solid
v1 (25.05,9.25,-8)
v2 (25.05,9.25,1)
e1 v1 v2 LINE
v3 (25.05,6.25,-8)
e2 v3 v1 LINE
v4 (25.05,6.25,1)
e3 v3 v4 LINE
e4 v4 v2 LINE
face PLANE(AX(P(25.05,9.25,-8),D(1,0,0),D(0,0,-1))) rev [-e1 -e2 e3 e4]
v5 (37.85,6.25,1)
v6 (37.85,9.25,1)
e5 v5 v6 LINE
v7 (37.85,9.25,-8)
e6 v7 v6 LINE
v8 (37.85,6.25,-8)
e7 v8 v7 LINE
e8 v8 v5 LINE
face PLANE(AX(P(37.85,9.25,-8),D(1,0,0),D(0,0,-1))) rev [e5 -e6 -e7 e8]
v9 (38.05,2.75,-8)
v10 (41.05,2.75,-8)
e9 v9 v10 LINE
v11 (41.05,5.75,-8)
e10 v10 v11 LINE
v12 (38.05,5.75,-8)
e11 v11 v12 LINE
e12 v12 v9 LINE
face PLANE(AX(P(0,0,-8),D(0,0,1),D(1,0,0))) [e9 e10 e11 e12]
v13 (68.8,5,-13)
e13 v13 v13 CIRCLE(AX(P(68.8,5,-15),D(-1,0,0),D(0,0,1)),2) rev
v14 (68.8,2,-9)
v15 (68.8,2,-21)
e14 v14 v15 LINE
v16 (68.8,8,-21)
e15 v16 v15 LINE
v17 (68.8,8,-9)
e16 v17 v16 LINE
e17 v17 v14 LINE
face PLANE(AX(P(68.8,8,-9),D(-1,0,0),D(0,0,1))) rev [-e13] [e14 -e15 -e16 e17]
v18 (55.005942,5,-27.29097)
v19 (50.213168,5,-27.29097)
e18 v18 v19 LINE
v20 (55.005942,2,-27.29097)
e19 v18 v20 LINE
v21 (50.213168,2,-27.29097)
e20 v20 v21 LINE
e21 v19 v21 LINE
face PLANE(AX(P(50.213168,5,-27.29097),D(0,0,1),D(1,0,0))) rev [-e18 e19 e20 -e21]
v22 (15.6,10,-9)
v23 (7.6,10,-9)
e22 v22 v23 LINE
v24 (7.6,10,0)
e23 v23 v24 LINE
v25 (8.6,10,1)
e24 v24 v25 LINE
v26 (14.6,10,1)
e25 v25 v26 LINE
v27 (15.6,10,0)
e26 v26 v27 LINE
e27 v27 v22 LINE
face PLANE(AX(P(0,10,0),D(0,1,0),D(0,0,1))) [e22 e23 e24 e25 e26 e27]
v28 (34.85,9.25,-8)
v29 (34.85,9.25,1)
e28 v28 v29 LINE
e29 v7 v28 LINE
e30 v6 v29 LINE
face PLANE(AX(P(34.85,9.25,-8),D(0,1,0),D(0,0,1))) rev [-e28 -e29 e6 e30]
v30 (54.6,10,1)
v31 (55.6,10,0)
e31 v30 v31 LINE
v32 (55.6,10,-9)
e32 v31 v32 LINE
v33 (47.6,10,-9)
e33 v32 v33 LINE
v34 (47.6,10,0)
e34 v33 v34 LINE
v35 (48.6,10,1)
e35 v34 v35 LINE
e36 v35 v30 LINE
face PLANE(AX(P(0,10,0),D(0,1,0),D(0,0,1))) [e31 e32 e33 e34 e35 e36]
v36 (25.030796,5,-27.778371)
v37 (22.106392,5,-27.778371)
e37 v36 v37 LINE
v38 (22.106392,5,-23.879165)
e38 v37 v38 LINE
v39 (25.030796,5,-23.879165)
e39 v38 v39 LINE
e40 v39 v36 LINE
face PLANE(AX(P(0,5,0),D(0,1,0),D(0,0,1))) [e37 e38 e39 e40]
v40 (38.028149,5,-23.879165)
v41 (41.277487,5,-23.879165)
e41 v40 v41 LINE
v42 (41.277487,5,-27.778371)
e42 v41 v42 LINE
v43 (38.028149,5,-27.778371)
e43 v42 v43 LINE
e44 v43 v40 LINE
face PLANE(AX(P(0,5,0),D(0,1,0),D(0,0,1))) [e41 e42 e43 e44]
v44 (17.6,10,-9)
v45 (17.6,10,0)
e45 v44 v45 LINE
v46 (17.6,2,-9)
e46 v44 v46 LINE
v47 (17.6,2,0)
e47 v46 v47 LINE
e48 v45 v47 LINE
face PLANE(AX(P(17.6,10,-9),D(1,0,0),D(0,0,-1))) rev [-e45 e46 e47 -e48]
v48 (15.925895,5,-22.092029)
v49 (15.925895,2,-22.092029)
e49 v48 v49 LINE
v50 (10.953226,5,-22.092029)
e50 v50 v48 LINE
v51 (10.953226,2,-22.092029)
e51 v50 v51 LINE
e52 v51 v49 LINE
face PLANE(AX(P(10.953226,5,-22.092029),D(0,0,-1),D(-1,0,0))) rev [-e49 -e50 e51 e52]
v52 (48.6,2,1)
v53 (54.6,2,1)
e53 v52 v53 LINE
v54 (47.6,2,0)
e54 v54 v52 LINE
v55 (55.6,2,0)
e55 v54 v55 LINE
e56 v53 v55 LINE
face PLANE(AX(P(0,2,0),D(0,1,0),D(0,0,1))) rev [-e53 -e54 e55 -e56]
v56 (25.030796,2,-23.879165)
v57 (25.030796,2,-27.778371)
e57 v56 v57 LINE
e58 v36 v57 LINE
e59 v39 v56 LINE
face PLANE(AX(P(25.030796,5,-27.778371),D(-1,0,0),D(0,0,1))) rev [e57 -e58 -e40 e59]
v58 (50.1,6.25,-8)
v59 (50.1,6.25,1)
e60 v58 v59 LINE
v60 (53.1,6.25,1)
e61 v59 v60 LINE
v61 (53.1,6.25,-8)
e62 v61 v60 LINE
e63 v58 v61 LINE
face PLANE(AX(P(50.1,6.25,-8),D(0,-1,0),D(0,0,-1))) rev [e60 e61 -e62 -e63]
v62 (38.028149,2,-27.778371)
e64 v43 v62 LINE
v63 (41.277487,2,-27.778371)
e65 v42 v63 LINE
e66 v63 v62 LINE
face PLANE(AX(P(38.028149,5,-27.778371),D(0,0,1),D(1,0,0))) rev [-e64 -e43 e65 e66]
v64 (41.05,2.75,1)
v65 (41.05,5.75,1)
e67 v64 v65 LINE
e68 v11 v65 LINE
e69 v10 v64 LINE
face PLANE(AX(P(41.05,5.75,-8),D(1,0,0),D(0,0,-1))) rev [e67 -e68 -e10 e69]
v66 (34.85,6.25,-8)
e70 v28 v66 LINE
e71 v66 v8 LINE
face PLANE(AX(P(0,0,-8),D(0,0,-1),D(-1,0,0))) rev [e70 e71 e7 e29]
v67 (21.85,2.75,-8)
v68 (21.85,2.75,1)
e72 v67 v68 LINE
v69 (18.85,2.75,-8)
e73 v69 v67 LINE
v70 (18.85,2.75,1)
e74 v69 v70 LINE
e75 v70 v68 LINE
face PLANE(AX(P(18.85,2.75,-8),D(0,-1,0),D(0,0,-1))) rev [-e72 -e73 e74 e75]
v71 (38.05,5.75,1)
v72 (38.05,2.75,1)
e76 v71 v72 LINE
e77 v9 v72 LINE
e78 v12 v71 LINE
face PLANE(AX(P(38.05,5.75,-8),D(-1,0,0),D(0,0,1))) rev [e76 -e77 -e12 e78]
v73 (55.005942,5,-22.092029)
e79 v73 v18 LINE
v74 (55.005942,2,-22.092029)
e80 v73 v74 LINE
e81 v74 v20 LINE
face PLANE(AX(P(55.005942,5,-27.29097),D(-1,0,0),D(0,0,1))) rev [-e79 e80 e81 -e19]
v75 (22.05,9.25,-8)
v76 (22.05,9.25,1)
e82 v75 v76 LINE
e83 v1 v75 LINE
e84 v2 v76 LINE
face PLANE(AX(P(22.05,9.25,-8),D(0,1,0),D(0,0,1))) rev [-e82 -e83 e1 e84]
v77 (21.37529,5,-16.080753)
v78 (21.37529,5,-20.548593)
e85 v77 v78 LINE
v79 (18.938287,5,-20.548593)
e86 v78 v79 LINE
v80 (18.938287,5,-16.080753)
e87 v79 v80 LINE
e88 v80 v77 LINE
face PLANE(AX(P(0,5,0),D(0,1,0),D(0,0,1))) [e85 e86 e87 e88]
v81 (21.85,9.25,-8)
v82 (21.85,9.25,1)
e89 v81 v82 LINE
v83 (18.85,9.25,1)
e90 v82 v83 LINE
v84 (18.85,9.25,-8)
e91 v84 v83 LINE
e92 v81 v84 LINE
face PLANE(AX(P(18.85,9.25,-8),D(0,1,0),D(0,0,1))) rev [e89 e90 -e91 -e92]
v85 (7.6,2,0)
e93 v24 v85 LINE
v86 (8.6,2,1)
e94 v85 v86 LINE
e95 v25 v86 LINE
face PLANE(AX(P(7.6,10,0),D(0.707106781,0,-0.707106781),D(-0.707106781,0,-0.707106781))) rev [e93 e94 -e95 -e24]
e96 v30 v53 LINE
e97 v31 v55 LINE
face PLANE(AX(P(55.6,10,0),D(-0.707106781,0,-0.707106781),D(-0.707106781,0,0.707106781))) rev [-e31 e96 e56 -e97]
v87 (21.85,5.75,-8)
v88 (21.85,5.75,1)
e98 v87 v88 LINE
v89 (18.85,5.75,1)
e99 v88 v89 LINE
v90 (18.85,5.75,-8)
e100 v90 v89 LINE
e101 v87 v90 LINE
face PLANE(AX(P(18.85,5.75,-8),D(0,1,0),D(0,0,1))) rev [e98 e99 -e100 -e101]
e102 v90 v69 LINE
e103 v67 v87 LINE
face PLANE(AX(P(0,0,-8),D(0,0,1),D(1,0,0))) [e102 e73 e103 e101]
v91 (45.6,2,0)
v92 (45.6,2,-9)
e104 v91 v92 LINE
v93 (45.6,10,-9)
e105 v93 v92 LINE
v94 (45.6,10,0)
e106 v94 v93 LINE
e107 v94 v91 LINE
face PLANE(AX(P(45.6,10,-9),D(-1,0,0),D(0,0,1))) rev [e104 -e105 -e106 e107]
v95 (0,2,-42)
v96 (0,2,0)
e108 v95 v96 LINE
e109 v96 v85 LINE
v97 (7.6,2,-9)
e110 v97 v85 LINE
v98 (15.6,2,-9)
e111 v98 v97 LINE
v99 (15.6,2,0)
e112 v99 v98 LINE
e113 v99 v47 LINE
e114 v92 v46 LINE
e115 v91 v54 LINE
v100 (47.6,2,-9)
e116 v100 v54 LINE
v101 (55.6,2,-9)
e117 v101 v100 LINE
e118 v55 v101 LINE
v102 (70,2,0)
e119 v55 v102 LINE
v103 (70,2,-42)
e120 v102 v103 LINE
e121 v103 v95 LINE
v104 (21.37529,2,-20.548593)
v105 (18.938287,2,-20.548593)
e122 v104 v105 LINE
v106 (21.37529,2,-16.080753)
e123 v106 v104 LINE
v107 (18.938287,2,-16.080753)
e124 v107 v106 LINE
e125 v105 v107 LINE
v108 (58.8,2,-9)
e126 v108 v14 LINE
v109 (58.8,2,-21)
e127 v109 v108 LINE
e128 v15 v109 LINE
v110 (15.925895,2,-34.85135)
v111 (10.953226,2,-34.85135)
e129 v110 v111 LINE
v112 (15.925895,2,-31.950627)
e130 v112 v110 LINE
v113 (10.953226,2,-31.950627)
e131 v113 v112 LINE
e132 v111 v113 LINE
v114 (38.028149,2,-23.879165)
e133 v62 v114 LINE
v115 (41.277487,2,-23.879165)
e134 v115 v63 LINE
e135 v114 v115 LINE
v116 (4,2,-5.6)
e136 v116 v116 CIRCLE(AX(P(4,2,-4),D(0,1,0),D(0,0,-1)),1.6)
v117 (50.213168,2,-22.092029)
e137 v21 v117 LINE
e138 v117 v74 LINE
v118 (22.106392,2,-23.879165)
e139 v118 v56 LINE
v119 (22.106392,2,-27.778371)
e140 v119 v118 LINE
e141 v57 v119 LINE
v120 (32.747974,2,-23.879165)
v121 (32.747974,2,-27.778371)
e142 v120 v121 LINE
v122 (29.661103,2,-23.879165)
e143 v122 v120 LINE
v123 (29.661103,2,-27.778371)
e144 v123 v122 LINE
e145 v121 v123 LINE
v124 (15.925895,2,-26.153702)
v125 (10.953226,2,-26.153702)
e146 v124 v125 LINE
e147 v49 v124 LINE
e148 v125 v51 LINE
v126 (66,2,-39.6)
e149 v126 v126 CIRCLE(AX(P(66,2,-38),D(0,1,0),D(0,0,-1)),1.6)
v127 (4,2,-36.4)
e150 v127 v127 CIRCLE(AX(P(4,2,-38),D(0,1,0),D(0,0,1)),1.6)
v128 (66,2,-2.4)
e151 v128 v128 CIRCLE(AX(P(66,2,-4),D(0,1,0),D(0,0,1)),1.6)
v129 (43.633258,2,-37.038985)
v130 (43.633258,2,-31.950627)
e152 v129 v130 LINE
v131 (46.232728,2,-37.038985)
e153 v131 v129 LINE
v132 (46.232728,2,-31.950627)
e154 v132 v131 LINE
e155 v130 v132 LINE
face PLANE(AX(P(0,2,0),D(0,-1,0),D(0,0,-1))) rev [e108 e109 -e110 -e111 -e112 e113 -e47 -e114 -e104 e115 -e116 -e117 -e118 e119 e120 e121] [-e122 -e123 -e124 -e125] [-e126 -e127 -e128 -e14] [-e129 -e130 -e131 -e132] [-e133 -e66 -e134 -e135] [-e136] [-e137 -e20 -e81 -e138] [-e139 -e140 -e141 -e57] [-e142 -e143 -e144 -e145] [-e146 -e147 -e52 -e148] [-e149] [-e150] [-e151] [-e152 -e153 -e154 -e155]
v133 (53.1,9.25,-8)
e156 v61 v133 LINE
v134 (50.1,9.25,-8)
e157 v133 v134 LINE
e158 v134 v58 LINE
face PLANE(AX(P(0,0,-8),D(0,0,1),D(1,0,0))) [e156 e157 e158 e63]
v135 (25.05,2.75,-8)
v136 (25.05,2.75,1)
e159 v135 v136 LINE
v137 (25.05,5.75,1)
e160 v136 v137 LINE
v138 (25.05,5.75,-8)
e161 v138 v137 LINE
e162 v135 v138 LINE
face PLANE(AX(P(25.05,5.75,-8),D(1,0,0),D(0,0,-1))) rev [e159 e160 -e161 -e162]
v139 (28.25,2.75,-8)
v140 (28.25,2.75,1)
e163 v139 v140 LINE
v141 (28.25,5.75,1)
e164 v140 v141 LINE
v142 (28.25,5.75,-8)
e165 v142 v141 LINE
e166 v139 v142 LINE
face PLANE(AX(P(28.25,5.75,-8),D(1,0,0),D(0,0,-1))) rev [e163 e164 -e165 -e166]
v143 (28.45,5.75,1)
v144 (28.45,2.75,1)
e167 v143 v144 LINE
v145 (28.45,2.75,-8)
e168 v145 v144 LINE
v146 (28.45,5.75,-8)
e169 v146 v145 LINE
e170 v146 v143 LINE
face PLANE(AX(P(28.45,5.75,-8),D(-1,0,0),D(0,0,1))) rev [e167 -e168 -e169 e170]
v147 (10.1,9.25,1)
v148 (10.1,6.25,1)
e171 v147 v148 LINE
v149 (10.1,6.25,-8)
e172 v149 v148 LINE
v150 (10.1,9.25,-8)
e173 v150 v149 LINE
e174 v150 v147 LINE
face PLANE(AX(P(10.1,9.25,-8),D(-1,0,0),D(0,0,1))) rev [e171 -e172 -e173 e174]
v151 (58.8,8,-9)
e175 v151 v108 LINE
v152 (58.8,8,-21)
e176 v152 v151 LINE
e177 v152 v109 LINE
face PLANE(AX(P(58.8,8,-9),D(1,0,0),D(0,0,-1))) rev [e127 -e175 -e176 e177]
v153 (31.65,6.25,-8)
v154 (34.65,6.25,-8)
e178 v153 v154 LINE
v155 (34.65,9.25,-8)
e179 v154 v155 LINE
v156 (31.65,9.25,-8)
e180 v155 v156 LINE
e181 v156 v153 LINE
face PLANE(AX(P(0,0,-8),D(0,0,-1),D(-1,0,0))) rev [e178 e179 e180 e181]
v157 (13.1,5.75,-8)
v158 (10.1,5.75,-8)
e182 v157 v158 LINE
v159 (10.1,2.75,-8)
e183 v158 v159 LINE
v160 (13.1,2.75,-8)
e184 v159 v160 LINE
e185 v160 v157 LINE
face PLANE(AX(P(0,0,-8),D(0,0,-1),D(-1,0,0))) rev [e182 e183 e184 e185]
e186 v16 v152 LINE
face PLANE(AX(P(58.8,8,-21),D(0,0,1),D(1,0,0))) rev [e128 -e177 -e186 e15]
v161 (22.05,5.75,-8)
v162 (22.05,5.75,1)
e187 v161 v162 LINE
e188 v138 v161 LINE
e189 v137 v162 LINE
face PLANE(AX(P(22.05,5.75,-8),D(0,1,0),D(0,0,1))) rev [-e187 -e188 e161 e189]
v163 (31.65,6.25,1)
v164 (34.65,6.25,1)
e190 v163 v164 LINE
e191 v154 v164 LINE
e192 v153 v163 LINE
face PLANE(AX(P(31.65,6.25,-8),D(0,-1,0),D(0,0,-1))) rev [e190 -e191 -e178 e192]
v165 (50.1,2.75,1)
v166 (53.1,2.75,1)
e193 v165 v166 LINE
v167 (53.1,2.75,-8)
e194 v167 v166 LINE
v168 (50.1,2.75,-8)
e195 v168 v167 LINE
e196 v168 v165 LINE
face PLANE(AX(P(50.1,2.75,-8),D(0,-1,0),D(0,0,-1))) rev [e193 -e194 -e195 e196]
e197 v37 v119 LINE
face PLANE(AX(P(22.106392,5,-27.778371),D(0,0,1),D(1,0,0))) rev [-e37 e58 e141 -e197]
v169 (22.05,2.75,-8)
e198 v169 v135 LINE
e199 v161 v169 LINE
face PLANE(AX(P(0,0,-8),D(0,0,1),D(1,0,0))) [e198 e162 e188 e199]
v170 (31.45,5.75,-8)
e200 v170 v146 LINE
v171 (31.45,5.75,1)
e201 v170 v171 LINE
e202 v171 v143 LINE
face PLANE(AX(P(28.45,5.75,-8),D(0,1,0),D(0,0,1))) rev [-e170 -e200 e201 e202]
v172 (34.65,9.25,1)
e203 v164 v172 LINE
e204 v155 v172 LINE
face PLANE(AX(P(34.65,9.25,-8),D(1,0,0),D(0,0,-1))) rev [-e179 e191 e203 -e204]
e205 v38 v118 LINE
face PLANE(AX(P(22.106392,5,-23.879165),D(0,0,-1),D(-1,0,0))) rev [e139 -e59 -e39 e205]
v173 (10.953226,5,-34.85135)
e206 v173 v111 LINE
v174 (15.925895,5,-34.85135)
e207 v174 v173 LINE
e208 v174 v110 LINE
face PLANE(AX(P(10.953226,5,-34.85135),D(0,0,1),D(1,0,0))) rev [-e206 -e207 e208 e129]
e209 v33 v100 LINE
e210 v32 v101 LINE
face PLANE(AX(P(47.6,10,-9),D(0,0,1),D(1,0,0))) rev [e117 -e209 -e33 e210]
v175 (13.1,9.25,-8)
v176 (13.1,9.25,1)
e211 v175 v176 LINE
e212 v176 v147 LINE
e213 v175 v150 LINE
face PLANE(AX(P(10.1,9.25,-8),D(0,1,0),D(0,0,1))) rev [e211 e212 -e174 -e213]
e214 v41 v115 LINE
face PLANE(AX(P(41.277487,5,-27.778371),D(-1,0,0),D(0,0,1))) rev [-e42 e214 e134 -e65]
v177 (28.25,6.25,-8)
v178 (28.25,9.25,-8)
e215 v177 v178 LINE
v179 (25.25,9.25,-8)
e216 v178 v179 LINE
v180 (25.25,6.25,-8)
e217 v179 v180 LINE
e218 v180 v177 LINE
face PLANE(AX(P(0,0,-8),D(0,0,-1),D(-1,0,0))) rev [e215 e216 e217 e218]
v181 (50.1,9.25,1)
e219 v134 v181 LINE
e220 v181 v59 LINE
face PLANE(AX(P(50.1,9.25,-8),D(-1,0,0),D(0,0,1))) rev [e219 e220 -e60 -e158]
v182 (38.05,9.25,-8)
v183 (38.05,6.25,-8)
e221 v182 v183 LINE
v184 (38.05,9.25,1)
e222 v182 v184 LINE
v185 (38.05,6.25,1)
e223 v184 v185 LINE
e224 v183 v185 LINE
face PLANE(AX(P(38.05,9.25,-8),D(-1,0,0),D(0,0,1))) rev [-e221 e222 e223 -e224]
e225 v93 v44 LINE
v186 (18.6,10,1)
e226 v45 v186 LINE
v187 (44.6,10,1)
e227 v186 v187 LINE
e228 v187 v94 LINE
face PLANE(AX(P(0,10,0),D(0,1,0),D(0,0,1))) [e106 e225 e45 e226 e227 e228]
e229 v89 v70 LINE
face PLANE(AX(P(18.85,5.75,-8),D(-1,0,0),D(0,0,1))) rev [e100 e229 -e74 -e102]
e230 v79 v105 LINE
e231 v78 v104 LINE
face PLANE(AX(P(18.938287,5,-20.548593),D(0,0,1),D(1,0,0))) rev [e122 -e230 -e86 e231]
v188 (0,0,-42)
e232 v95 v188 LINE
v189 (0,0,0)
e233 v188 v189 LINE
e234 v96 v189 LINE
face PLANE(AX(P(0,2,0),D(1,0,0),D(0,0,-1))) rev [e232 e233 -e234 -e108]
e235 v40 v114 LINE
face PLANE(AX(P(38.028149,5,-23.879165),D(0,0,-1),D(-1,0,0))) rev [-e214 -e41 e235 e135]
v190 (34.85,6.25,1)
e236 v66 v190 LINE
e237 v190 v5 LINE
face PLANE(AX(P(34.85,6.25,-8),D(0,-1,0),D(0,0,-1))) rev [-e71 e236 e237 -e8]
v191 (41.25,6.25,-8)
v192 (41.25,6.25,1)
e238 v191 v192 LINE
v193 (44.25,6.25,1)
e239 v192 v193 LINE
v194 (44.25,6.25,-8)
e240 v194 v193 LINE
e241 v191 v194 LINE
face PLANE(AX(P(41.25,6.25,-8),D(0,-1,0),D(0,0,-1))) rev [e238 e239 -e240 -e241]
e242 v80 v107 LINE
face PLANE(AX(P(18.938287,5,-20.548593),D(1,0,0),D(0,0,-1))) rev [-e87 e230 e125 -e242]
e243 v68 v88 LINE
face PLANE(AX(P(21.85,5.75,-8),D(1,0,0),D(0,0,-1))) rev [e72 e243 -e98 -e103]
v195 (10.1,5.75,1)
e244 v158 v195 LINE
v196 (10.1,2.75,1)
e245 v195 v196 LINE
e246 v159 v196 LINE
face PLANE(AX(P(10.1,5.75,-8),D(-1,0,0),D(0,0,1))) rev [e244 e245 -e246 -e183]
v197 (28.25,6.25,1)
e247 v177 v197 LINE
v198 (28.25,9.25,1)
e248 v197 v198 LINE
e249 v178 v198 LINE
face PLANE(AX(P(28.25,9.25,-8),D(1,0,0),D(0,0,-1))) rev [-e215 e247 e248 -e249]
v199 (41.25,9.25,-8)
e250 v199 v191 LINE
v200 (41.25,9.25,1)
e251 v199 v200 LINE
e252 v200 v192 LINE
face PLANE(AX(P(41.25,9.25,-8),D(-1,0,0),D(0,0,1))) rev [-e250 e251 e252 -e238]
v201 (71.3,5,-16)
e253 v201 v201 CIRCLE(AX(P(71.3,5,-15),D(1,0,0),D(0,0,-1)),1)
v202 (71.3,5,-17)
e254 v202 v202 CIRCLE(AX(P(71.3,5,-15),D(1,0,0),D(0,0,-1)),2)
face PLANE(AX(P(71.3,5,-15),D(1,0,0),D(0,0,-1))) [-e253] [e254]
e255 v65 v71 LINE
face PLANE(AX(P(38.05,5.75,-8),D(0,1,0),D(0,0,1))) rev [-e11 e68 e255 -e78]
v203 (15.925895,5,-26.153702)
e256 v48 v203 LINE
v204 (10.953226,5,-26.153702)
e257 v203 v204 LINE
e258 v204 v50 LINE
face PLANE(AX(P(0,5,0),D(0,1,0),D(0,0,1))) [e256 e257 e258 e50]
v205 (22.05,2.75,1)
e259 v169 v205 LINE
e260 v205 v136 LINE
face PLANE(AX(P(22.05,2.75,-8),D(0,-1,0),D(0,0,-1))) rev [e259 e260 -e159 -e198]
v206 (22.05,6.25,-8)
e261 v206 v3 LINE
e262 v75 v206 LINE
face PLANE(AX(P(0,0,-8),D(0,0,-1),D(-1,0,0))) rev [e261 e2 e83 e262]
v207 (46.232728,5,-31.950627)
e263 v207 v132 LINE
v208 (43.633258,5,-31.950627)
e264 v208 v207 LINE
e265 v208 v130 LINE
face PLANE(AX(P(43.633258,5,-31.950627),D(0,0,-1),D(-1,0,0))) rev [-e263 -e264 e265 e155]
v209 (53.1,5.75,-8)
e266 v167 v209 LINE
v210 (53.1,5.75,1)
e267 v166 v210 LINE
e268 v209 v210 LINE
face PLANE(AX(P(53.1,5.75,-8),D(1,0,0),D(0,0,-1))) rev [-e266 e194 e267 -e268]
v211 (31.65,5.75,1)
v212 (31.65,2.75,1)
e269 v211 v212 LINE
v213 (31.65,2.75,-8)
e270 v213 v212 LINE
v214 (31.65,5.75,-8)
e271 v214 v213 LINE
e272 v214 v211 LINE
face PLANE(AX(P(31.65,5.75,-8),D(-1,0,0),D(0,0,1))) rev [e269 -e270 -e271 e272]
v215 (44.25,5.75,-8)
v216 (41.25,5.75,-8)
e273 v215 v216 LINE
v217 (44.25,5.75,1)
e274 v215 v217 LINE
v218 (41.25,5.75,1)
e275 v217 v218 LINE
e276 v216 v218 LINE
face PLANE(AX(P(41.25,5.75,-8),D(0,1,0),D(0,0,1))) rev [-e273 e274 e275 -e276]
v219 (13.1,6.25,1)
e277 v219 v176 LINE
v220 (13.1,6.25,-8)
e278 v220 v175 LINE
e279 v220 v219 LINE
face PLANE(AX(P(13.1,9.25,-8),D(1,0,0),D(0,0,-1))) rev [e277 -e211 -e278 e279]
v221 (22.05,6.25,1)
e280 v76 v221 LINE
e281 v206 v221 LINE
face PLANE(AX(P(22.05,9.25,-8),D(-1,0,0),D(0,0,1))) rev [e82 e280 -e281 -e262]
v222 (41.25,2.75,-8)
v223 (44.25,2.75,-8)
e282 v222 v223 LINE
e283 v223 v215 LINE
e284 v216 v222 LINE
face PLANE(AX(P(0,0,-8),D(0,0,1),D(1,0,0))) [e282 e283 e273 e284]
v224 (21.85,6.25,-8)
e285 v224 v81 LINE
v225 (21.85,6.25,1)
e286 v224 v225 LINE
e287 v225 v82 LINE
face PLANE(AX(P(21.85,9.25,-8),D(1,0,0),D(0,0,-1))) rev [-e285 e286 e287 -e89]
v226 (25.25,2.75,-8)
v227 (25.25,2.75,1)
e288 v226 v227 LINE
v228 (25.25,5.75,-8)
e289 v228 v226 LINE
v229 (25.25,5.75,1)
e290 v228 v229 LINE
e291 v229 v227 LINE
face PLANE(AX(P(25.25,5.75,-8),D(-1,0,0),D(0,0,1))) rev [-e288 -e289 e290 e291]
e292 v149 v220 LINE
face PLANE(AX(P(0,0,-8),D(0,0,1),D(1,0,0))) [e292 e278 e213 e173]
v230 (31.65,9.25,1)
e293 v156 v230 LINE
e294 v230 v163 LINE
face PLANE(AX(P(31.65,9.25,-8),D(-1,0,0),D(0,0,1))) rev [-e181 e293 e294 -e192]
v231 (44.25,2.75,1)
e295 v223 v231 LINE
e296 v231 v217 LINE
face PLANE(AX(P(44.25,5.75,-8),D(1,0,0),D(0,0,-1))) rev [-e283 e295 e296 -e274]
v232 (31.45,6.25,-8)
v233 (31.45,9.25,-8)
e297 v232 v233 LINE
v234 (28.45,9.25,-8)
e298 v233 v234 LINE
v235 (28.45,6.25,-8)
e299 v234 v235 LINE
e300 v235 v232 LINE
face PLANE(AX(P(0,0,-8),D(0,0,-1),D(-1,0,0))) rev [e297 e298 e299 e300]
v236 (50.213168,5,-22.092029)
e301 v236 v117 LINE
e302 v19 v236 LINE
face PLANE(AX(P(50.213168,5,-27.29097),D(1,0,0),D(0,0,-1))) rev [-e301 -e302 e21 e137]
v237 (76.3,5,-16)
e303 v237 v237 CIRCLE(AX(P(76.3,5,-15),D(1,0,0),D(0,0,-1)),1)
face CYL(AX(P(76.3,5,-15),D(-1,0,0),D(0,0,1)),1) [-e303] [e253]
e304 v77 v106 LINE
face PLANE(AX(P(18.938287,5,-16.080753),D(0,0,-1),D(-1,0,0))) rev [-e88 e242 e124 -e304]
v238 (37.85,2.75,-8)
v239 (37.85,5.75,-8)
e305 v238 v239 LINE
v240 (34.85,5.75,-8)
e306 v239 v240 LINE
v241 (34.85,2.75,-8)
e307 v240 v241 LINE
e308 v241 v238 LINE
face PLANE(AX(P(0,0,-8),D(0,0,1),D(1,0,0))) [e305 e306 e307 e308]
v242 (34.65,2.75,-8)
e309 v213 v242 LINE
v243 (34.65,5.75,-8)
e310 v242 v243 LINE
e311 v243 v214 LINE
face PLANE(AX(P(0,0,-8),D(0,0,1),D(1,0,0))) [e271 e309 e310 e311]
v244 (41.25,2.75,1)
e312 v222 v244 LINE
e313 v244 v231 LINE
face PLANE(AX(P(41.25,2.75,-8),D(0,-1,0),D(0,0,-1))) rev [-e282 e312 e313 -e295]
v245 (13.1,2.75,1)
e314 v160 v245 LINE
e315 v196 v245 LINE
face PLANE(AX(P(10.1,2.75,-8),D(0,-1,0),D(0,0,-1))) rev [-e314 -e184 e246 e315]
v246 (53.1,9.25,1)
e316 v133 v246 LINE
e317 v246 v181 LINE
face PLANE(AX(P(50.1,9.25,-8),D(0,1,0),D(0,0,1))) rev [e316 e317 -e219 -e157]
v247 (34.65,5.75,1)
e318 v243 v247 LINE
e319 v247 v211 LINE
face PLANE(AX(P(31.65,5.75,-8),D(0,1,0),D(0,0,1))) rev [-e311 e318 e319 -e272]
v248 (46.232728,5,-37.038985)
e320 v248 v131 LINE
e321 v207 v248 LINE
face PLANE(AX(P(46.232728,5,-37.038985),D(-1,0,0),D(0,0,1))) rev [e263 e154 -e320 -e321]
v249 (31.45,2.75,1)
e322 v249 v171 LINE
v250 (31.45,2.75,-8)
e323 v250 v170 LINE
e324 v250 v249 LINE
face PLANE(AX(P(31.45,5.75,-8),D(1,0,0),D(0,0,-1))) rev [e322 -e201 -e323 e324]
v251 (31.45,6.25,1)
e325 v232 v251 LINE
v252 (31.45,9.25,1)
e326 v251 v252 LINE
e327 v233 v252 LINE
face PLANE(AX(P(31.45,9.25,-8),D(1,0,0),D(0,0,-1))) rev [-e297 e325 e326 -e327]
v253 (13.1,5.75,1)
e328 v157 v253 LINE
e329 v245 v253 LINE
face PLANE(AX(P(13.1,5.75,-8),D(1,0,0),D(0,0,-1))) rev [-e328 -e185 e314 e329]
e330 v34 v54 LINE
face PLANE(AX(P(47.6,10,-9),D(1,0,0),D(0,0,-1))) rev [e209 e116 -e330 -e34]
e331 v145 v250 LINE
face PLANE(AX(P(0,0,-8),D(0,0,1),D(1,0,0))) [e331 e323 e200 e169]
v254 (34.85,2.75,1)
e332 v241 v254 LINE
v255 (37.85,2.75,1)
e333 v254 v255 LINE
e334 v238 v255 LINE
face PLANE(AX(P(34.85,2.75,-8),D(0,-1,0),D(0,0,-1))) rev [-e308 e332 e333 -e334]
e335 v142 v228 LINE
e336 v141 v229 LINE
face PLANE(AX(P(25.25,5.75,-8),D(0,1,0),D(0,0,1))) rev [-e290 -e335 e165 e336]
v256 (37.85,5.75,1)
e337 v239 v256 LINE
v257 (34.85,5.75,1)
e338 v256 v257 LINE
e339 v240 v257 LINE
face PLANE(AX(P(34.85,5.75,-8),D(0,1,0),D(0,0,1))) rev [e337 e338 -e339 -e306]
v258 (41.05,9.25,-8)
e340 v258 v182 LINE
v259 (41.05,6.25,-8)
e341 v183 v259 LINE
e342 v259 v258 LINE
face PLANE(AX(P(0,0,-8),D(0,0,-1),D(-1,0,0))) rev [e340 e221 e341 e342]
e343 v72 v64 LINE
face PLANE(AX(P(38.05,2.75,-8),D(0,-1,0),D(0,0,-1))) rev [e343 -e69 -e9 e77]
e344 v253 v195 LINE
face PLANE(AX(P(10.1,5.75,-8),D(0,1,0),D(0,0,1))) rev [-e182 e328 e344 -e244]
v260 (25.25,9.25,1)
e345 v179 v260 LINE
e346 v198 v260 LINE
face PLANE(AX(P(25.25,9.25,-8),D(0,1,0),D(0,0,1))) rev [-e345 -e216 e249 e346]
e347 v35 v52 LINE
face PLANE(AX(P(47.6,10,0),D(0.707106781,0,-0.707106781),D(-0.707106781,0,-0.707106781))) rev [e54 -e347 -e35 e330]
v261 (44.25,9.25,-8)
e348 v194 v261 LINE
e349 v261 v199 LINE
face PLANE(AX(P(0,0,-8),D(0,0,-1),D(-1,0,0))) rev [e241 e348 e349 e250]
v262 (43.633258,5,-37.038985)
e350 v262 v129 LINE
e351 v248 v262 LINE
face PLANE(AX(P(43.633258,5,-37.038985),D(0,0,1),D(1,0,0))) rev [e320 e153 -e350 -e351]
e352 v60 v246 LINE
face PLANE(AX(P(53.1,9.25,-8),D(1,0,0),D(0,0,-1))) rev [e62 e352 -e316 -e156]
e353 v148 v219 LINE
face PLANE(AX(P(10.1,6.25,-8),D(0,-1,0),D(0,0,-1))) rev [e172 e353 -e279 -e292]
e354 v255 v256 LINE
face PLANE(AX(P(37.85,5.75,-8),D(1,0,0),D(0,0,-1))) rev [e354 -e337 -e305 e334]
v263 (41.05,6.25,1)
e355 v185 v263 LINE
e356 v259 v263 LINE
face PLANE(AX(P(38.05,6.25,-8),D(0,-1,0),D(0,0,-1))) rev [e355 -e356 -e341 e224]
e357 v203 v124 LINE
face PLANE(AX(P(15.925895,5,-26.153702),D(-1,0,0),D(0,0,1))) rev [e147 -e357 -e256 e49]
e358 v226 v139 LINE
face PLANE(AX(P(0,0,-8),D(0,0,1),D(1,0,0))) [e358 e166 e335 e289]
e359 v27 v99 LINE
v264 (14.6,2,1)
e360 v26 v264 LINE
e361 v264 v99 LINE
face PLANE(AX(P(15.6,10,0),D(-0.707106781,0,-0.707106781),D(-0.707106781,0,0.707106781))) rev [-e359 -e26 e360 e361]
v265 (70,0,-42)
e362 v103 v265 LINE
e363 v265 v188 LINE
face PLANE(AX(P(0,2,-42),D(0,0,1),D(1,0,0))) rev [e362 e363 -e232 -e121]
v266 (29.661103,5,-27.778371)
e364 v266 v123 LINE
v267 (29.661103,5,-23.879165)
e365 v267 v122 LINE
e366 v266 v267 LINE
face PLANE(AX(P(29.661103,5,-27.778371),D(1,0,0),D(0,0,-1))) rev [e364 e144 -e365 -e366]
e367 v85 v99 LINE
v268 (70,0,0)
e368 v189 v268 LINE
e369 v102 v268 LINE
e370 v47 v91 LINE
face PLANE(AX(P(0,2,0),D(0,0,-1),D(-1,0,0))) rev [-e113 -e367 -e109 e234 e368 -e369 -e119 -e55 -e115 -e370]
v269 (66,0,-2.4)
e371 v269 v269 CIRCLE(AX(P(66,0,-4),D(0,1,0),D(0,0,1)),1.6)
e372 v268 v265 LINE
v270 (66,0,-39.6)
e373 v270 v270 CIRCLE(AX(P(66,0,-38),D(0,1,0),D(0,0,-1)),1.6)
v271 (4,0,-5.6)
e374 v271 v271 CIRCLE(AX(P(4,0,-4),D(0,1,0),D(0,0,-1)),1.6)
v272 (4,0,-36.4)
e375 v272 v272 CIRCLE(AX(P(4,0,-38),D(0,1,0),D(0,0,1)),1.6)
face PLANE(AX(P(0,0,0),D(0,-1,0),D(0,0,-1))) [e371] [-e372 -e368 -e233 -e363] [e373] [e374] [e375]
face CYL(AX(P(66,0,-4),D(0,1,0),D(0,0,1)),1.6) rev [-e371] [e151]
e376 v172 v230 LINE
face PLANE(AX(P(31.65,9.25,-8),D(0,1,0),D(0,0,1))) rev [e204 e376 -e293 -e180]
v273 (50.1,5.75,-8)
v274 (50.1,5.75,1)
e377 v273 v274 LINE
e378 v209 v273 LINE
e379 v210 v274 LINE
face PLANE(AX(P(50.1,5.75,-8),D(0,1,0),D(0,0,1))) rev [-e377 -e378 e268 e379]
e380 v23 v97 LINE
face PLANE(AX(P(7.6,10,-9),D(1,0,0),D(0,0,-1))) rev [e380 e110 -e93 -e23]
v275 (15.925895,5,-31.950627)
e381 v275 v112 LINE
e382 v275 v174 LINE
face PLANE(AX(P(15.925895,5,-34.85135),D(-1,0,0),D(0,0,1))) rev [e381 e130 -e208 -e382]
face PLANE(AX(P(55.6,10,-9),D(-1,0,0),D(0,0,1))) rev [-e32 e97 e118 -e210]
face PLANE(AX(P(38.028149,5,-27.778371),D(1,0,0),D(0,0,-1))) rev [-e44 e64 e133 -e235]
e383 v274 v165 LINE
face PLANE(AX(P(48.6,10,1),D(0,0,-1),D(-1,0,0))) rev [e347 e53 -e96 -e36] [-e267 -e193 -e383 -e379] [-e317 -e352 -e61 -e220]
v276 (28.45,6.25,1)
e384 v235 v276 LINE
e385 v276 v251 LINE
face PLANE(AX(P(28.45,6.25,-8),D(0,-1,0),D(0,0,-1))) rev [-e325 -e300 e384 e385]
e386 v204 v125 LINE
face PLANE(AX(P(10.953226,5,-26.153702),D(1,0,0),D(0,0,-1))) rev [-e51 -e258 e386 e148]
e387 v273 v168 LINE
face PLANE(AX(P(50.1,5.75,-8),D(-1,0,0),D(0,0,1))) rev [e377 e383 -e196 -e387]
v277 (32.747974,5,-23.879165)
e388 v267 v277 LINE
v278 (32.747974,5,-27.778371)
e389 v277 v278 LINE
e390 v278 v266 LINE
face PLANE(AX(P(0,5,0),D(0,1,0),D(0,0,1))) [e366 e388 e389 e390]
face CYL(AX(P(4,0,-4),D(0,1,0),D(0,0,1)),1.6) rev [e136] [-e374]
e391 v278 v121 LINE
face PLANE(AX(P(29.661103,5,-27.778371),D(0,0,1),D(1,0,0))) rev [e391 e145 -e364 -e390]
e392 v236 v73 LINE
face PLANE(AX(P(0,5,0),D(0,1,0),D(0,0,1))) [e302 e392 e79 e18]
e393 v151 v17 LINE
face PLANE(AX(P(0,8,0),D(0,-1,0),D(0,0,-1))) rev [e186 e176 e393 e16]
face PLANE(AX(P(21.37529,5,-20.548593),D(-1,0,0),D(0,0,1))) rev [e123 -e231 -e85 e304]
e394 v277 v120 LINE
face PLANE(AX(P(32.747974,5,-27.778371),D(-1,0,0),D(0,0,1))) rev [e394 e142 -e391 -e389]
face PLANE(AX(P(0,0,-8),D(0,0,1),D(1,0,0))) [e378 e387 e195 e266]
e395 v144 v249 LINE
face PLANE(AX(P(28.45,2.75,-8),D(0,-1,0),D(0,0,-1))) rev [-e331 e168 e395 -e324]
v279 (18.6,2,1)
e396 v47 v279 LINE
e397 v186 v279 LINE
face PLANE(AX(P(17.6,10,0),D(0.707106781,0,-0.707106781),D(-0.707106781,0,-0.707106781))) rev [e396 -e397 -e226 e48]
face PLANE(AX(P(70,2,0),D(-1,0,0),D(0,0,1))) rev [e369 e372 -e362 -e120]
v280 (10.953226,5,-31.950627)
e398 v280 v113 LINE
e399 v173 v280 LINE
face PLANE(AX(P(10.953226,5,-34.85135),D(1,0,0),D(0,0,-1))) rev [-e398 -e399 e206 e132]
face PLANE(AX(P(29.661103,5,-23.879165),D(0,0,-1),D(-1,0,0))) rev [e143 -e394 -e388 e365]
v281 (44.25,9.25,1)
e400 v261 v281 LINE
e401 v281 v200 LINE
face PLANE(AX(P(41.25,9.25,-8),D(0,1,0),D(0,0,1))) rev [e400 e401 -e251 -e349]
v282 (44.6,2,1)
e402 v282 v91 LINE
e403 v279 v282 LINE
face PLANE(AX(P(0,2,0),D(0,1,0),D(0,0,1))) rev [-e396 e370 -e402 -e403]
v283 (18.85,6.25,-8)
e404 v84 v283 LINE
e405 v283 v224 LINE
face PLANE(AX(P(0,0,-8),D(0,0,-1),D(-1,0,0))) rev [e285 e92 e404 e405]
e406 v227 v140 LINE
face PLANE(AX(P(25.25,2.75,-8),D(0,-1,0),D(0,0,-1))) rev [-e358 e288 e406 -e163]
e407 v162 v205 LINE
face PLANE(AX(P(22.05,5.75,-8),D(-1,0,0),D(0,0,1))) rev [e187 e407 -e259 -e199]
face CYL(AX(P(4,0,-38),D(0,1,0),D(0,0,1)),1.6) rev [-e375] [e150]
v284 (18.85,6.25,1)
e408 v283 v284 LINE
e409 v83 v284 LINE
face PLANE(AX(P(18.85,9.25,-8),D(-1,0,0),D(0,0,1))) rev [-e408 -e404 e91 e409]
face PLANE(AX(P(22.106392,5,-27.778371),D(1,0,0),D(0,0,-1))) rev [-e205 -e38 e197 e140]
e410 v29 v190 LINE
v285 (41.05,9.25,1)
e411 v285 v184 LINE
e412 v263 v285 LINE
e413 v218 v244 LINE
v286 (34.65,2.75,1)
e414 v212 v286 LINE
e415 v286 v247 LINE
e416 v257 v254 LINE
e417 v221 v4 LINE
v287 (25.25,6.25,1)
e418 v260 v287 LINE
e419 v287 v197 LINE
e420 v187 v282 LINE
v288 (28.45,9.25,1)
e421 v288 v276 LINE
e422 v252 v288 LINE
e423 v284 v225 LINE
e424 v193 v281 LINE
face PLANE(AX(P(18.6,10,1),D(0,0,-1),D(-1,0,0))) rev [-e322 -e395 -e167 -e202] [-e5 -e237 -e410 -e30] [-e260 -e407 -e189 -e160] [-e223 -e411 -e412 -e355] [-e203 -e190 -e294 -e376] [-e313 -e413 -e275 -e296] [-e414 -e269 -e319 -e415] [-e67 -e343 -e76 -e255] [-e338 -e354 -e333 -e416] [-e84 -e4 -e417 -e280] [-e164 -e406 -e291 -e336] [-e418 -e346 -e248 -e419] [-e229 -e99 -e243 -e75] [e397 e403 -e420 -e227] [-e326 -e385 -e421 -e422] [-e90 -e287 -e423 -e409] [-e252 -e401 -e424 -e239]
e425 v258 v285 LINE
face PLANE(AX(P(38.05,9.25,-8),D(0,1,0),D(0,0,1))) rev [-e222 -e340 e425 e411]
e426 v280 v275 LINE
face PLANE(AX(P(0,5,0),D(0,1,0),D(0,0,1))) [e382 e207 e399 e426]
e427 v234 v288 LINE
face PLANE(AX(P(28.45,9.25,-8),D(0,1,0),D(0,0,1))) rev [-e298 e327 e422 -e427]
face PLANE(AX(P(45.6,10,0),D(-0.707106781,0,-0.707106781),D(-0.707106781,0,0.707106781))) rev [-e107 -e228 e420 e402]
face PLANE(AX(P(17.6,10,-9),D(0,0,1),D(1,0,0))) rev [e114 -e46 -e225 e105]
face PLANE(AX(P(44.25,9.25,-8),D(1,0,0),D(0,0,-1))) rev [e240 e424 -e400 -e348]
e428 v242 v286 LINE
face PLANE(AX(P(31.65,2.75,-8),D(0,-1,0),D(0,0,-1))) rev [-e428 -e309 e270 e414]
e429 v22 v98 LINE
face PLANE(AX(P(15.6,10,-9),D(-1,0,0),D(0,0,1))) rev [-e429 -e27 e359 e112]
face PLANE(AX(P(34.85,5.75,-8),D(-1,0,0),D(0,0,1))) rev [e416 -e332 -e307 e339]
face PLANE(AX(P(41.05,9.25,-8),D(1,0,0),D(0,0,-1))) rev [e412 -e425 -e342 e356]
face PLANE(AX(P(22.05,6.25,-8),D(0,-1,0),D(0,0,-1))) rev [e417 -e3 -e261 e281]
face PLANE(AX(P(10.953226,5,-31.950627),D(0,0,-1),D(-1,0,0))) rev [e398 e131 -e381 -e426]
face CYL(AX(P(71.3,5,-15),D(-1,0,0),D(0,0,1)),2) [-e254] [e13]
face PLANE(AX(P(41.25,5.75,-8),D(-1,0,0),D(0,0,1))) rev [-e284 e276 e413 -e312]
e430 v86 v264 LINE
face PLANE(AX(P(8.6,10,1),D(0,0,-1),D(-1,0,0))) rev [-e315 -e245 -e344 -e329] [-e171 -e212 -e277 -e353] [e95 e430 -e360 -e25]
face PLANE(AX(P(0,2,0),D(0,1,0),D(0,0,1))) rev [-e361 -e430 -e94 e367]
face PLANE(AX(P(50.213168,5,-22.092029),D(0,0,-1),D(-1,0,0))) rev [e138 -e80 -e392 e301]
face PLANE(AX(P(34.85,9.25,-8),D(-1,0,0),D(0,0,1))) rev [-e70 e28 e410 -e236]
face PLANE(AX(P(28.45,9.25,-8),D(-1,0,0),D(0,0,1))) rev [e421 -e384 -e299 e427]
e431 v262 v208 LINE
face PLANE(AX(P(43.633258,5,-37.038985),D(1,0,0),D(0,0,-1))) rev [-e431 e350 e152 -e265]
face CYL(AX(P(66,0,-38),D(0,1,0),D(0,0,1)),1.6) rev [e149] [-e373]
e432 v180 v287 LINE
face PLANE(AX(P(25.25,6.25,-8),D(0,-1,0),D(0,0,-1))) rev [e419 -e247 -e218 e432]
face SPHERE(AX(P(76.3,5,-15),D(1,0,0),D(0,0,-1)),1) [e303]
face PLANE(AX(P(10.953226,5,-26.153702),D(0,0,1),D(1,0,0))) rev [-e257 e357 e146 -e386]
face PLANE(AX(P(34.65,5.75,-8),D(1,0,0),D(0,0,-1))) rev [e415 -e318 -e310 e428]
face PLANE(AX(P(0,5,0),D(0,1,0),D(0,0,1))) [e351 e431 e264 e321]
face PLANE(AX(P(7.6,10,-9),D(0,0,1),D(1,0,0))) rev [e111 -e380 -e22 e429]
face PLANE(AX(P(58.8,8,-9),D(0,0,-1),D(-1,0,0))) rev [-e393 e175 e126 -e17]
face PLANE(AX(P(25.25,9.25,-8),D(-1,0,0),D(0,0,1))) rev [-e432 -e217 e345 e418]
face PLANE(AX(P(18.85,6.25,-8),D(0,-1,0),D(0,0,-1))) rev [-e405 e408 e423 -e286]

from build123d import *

# Parameters (mm, degrees)
SKETCH1_W           = 70
SKETCH1_H           = 42
BOSS_EXTRUDE1_DEPTH = 2
SKETCH4_R           = 1.6
CUT_EXTRUDE2_DEPTH  = 82.65782265
BOSS_EXTRUDE2_DEPTH = 8
SKETCH6_W           = 3
SKETCH6_H           = 3
CUT_EXTRUDE3_DEPTH  = 9
SKETCH7_W           = 10
SKETCH7_H           = 12
BOSS_EXTRUDE3_DEPTH = 6
SKETCH8_R           = 2
BOSS_EXTRUDE4_DEPTH = 2.5
SKETCH9_R           = 1
BOSS_EXTRUDE5_DEPTH = 5
SKETCH10_W          = 4.972668361
SKETCH10_H          = 2.900723211
SKETCH10_H_2        = 4.06167287
SKETCH10_W_2        = 4.792773987
SKETCH10_H_3        = 5.198941274
SKETCH10_W_3        = 2.924404467
SKETCH10_H_4        = 3.899205956
SKETCH10_W_4        = 3.086871382
SKETCH10_W_5        = 3.249338296
SKETCH10_W_6        = 2.437003722
SKETCH10_H_5        = 4.467840158
SKETCH10_W_7        = 2.599470637
SKETCH10_H_6        = 5.088357614
BOSS_EXTRUDE6_DEPTH = 3


# Read off the part's stored shape, not the designer's step: Dome1
with BuildPart() as part:
    # Sketch1 → Boss-Extrude1 (new body)
    with BuildSketch(Plane(origin=(0, 0, 0), x_dir=(1, 0, 0), z_dir=(0, 1, 0))):
        with Locations((35, 21)):
            Rectangle(SKETCH1_W, SKETCH1_H)
    extrude(amount=BOSS_EXTRUDE1_DEPTH)

    # Sketch4 → Cut-Extrude2 (cut, through all)
    with BuildSketch(Plane(origin=(0, 2, 0), x_dir=(1, 0, 0), z_dir=(0, 1, 0))):
        with Locations(Location((4, 38, 0), (0, 0, 270))):
            Circle(SKETCH4_R)
        with Locations(Location((66, 4, 0), (0, 0, 270))):
            Circle(SKETCH4_R)
        with Locations(Location((4, 4, 0), (0, 0, 90))):
            Circle(SKETCH4_R)
        with Locations(Location((66, 38, 0), (0, 0, 90))):
            Circle(SKETCH4_R)
    extrude(amount=-CUT_EXTRUDE2_DEPTH, mode=Mode.SUBTRACT)

    # Sketch5 → Boss-Extrude2 (add)
    with BuildSketch(Plane(origin=(0, 2, 0), x_dir=(1, 0, 0), z_dir=(0, 1, 0))):
        Polygon((17.6, 9), (45.6, 9), (45.6, 0), (44.6, -1), (18.6, -1), (17.6, 0), align=None)
        Polygon((7.6, 9), (15.6, 9), (15.6, 0), (14.6, -1), (8.6, -1), (7.6, 0), align=None)
        Polygon((47.6, 9), (55.6, 9), (55.6, 0), (54.6, -1), (48.6, -1), (47.6, 0), align=None)
    extrude(amount=BOSS_EXTRUDE2_DEPTH)

    # Sketch6 → Cut-Extrude3 (cut)
    with BuildSketch(Plane.XY.offset(1)):
        with Locations((20.35, 4.25)):
            Rectangle(SKETCH6_W, SKETCH6_H)
        with Locations((11.6, 7.75)):
            Rectangle(SKETCH6_W, SKETCH6_H)
        with Locations((23.55, 4.25)):
            Rectangle(SKETCH6_W, SKETCH6_H)
        with Locations((11.6, 4.25)):
            Rectangle(SKETCH6_W, SKETCH6_H)
        with Locations((20.35, 7.75)):
            Rectangle(SKETCH6_W, SKETCH6_H)
        with Locations((51.6, 7.75)):
            Rectangle(SKETCH6_W, SKETCH6_H)
        with Locations((23.55, 7.75)):
            Rectangle(SKETCH6_W, SKETCH6_H)
        with Locations((26.75, 4.25)):
            Rectangle(SKETCH6_W, SKETCH6_H)
        with Locations((26.75, 7.75)):
            Rectangle(SKETCH6_W, SKETCH6_H)
        with Locations((29.95, 4.25)):
            Rectangle(SKETCH6_W, SKETCH6_H)
        with Locations((29.95, 7.75)):
            Rectangle(SKETCH6_W, SKETCH6_H)
        with Locations((33.15, 4.25)):
            Rectangle(SKETCH6_W, SKETCH6_H)
        with Locations((33.15, 7.75)):
            Rectangle(SKETCH6_W, SKETCH6_H)
        with Locations((36.35, 4.25)):
            Rectangle(SKETCH6_W, SKETCH6_H)
        with Locations((36.35, 7.75)):
            Rectangle(SKETCH6_W, SKETCH6_H)
        with Locations((39.55, 4.25)):
            Rectangle(SKETCH6_W, SKETCH6_H)
        with Locations((39.55, 7.75)):
            Rectangle(SKETCH6_W, SKETCH6_H)
        with Locations((42.75, 4.25)):
            Rectangle(SKETCH6_W, SKETCH6_H)
        with Locations((42.75, 7.75)):
            Rectangle(SKETCH6_W, SKETCH6_H)
        with Locations((51.6, 4.25)):
            Rectangle(SKETCH6_W, SKETCH6_H)
    extrude(amount=-CUT_EXTRUDE3_DEPTH, mode=Mode.SUBTRACT)

    # Sketch7 → Boss-Extrude3 (add)
    with BuildSketch(Plane(origin=(0, 2, 0), x_dir=(1, 0, 0), z_dir=(0, 1, 0))):
        with Locations((63.8, 15)):
            Rectangle(SKETCH7_W, SKETCH7_H)
    extrude(amount=BOSS_EXTRUDE3_DEPTH)

    # Sketch8 → Boss-Extrude4 (add)
    with BuildSketch(Plane(origin=(68.8, 0, 0), x_dir=(0, 0, -1), z_dir=(1, 0, 0))):
        with Locations(Location((15, 5, 0), (0, 0, 180))):
            Circle(SKETCH8_R)
    extrude(amount=BOSS_EXTRUDE4_DEPTH)

    # Sketch9 → Boss-Extrude5 (add)
    with BuildSketch(Plane(origin=(71.3, 0, 0), x_dir=(0, 0, -1), z_dir=(1, 0, 0))):
        with Locations((15, 5)):
            Circle(SKETCH9_R)
    extrude(amount=BOSS_EXTRUDE5_DEPTH)

    # Dome1 outline → Dome1 (revolve)
    with BuildSketch(Plane(origin=(0, 5, -15), x_dir=(0, 1, 0), z_dir=(0, 0, -1))):
        with BuildLine():
            Line((0, 76.3), (1, 76.299999999))
            ThreePointArc((1, 76.299999999), (0.707106782, 77.007106781), (0, 77.3))
            Line((0, 77.3), (0, 76.3))
        make_face()
    revolve(axis=Axis((0, 5, -15), (1, 0, 0)))

    # Sketch10 → Boss-Extrude6 (add)
    with BuildSketch(Plane(origin=(0, 2, 0), x_dir=(1, 0, 0), z_dir=(0, 1, 0))):
        with Locations((13.43956041, 33.400988797)):
            Rectangle(SKETCH10_W, SKETCH10_H)
        with Locations((13.43956041, 24.122865076)):
            Rectangle(SKETCH10_W, SKETCH10_H_2)
        with Locations((52.609554771, 24.691499278)):
            Rectangle(SKETCH10_W_2, SKETCH10_H_3)
        with Locations((23.568593744, 25.828767682)):
            Rectangle(SKETCH10_W_3, SKETCH10_H_4)
        with Locations((31.204538742, 25.828767682)):
            Rectangle(SKETCH10_W_4, SKETCH10_H_4)
        with Locations((39.652818313, 25.828767682)):
            Rectangle(SKETCH10_W_5, SKETCH10_H_4)
        with Locations((20.156788533, 18.314672871)):
            Rectangle(SKETCH10_W_6, SKETCH10_H_5)
        with Locations((44.932993045, 34.494805998)):
            Rectangle(SKETCH10_W_7, SKETCH10_H_6)
    extrude(amount=BOSS_EXTRUDE6_DEPTH)


solid = part.part
